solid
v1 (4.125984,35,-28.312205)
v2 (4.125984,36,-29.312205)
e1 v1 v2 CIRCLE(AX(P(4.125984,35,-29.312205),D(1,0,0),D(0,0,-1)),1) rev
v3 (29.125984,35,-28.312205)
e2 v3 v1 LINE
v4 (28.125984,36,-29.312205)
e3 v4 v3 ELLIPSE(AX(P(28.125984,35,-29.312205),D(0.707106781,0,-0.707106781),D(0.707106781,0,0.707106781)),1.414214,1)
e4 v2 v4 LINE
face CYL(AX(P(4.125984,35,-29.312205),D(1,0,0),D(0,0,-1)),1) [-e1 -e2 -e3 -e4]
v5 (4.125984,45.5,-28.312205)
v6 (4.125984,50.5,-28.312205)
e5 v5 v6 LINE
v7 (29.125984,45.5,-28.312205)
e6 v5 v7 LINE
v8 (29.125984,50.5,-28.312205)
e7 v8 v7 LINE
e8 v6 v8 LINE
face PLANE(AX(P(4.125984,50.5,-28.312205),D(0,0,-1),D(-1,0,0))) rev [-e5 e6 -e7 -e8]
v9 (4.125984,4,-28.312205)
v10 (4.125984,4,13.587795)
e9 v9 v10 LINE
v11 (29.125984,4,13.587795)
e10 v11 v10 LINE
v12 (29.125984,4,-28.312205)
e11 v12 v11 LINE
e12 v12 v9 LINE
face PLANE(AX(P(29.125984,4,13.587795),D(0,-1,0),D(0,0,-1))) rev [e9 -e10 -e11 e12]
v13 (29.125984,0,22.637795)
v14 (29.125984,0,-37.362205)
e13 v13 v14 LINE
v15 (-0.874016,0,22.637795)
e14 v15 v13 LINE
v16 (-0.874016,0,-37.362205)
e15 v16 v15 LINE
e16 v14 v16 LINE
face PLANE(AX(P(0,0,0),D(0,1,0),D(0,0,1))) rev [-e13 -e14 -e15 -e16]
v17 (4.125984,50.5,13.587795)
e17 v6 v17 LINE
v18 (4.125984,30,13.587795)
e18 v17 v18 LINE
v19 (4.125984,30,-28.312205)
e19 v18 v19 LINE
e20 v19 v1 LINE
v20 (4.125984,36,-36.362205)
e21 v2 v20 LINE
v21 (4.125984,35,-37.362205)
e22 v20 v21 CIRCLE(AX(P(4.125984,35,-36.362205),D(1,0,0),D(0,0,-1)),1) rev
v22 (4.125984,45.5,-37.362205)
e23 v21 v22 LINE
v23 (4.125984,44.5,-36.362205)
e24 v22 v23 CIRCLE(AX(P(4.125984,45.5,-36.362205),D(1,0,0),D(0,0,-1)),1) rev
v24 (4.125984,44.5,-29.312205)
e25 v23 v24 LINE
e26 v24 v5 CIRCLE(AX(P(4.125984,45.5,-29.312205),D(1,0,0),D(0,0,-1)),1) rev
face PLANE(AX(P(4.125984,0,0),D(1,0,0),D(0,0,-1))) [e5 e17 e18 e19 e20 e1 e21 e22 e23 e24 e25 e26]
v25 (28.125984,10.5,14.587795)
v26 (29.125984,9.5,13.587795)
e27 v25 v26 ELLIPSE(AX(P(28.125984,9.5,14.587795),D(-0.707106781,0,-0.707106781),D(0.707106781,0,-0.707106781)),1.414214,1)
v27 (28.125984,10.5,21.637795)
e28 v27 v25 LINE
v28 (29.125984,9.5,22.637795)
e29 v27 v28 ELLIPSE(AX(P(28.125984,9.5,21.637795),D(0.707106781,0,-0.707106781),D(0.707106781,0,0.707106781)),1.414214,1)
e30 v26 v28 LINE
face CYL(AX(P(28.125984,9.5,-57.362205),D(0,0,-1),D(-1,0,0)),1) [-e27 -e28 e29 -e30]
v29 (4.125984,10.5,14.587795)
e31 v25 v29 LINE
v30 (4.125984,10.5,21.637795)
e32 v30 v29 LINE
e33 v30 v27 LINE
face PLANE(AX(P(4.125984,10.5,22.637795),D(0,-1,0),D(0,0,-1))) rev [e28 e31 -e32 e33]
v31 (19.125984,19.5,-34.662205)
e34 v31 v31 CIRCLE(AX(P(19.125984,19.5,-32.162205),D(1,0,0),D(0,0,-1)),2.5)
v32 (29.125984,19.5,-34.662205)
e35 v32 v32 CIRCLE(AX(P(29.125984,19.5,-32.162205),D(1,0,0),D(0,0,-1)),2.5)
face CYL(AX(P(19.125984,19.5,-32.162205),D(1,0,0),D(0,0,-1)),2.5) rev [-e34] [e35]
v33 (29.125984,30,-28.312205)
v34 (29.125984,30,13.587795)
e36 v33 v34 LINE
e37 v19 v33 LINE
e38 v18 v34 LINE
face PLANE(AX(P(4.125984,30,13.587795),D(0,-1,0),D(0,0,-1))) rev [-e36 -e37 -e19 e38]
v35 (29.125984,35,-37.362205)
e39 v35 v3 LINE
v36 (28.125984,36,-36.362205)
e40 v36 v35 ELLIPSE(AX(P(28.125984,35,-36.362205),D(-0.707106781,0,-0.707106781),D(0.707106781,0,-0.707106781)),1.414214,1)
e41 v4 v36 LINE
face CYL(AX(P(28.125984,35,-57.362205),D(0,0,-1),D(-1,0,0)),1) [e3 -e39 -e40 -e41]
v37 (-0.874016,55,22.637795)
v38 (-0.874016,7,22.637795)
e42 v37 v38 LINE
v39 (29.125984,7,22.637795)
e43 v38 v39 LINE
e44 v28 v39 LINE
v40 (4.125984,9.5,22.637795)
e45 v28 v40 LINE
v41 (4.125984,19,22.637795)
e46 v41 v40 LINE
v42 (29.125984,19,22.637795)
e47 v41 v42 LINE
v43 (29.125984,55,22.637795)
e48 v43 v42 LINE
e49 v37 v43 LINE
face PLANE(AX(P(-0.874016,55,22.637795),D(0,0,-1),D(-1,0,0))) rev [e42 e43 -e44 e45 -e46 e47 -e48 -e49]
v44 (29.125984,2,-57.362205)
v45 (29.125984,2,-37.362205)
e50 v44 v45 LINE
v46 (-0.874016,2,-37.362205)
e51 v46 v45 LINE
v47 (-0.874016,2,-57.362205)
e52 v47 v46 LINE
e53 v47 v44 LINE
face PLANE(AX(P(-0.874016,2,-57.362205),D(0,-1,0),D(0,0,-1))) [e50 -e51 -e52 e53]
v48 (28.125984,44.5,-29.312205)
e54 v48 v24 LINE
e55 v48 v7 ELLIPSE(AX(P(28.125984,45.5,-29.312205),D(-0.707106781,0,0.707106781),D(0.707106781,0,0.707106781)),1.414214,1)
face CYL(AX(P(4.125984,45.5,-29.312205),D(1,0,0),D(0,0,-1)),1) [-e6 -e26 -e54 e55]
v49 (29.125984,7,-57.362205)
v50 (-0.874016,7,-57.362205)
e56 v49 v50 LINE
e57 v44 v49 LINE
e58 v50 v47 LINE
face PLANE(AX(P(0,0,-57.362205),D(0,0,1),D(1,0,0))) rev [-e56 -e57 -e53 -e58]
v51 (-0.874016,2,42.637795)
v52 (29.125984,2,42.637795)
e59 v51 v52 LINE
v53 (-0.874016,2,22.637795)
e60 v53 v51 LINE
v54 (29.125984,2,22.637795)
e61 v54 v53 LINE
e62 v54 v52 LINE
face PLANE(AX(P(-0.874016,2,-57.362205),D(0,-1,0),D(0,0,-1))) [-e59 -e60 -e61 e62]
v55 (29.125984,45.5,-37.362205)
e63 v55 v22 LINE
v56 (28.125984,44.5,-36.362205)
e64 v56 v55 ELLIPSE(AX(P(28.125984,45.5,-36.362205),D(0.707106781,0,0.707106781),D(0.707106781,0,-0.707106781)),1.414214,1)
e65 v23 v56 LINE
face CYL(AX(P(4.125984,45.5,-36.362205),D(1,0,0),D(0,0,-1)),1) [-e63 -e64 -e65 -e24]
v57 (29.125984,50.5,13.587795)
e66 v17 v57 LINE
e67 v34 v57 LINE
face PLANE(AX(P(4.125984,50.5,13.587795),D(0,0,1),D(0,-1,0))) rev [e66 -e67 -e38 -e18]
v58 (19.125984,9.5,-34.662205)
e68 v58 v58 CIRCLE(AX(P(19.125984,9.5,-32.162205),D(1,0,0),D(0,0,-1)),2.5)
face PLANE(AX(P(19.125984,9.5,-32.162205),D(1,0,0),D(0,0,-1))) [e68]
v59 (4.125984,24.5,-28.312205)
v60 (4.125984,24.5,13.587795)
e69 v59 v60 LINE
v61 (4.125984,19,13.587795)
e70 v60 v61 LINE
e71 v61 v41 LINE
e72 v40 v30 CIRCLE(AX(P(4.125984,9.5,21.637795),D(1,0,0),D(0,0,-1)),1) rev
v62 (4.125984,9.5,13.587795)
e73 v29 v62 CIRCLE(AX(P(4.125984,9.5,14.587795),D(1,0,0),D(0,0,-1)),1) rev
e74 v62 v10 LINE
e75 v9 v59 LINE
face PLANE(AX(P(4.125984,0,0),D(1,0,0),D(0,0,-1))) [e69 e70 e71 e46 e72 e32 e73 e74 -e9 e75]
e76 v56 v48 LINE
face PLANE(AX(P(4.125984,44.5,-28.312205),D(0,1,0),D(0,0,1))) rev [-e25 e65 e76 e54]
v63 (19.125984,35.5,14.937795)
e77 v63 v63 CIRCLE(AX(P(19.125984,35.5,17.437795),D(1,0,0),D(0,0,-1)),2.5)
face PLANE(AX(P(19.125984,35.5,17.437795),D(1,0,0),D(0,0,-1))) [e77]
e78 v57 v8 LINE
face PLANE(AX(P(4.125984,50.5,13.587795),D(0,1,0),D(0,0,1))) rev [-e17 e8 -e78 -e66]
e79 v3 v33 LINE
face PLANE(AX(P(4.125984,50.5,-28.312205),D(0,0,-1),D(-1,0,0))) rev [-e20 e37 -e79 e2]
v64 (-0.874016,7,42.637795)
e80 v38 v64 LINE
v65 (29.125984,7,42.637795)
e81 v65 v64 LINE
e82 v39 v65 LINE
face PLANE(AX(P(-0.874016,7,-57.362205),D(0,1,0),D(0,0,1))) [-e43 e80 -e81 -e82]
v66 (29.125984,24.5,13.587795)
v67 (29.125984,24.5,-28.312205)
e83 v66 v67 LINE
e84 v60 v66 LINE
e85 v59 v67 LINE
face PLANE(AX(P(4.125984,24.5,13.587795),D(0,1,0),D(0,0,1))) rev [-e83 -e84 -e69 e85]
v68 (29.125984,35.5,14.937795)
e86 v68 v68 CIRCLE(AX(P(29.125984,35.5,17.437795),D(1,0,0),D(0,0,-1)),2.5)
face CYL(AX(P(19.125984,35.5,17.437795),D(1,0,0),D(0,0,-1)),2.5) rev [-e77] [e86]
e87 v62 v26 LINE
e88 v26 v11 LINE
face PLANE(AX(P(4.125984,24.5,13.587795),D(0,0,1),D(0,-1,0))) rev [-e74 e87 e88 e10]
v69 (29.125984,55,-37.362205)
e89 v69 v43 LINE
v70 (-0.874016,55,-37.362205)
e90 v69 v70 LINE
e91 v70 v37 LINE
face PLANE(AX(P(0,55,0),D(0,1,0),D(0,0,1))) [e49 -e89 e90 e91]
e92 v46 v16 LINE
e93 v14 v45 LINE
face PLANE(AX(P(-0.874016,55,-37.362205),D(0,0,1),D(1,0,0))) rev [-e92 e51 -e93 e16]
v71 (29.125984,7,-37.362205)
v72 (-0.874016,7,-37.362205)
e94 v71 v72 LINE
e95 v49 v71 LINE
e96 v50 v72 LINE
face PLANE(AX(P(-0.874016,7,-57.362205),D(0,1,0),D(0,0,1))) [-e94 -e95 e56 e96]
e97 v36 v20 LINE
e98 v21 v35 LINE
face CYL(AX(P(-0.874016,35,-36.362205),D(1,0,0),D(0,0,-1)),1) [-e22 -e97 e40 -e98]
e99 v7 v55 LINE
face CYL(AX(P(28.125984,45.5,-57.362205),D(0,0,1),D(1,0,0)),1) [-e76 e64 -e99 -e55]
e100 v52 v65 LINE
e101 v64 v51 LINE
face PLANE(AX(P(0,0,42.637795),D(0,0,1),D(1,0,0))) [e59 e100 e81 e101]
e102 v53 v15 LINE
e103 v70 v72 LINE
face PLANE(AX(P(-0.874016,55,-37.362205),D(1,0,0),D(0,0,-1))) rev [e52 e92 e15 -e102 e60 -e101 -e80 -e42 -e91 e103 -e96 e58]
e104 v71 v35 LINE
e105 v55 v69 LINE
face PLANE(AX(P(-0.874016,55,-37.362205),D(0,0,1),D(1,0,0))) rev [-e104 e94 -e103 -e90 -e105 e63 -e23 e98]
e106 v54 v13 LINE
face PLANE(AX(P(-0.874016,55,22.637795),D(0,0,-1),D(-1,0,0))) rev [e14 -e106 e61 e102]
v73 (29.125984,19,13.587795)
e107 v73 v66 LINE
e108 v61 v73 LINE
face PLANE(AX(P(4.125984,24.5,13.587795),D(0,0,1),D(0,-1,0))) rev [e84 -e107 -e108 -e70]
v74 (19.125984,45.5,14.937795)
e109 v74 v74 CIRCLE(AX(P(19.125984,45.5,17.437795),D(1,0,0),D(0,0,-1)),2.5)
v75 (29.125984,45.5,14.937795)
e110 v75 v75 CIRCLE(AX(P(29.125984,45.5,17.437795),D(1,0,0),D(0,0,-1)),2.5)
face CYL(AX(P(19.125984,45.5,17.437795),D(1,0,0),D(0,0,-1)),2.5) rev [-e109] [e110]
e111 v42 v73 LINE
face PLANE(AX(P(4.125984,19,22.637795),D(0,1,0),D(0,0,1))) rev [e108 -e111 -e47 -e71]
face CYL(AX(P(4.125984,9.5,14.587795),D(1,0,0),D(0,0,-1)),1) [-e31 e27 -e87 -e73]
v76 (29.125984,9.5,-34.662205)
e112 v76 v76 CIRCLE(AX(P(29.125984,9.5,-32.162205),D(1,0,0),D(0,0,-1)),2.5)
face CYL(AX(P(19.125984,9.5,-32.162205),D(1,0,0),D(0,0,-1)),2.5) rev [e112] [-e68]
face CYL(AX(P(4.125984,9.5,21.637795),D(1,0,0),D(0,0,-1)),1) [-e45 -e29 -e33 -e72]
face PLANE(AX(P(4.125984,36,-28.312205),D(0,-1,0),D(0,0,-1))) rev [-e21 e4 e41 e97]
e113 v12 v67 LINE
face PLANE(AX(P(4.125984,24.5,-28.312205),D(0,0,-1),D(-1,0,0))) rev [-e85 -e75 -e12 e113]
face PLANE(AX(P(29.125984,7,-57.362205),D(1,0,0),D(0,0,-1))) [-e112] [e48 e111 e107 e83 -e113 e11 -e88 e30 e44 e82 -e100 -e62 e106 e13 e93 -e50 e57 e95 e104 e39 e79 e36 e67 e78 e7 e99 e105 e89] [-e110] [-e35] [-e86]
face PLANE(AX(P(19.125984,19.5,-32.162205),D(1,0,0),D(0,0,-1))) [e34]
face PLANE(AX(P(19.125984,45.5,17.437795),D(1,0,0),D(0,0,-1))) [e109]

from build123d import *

# Parameters (mm, degrees)
SKETCH1_W                 = 43
SKETCH1_H                 = 60
BOSS_EXTRUDE1_DEPTH       = 55
SKETCH2_W                 = 41.9
SKETCH2_H                 = 20.5
SKETCH2_H_2               = 20
CUT_EXTRUDE1_DEPTH        = 38
SKETCH3_W                 = 9.05
SKETCH3_H                 = 8.5
CUT_EXTRUDE2_DEPTH        = 38
BOSS_EXTRUDE5_START       = -0.874015748
BOSS_EXTRUDE5_OUTLINE_W   = 2.5
BOSS_EXTRUDE5_OUTLINE_H   = 41.9
BOSS_EXTRUDE5_OUTLINE_W_2 = 5
BOSS_EXTRUDE5_OUTLINE_H_2 = 20
BOSS_EXTRUDE5_DEPTH       = 30
SKETCH18_R                = 2.5
CUT_EXTRUDE9_DEPTH        = 10
SKETCH19_R                = 2.5
CUT_EXTRUDE10_DEPTH       = 10
SKETCH20_W                = 41.9
SKETCH20_H                = 5
CUT_EXTRUDE11_DEPTH       = 25
SKETCH21_W                = 60
SKETCH21_H                = 55
CUT_EXTRUDE12_DEPTH       = 13
SKETCH22_W                = 41.9
SKETCH22_H                = 2
BOSS_EXTRUDE6_DEPTH       = 25
FILLET4_R                 = 1
FILLET5_R                 = 1


# Read off the part's stored shape, not the designer's step: Boss-Extrude5
with BuildPart() as part:
    # Sketch1 → Boss-Extrude1 (new body)
    with BuildSketch(Plane(origin=(0, 0, 0), x_dir=(1, 0, 0), z_dir=(0, 1, 0))):
        with Locations((20.625984252, 7.362204724)):
            Rectangle(SKETCH1_W, SKETCH1_H)
    extrude(amount=BOSS_EXTRUDE1_DEPTH)

    # Sketch2 → Cut-Extrude1 (cut)
    with BuildSketch(Plane(origin=(42.125984252, 0, 0), x_dir=(0, 0, -1), z_dir=(1, 0, 0))):
        with Locations((7.362204724, 40.25)):
            Rectangle(SKETCH2_W, SKETCH2_H)
        with Locations((7.362204724, 14.5)):
            Rectangle(SKETCH2_W, SKETCH2_H_2)
    extrude(amount=-CUT_EXTRUDE1_DEPTH, mode=Mode.SUBTRACT)

    # Sketch3 → Cut-Extrude2 (cut)
    with BuildSketch(Plane(origin=(42.125984252, 0, 0), x_dir=(0, 0, -1), z_dir=(1, 0, 0))):
        with Locations((-18.112795276, 14.75)):
            Rectangle(SKETCH3_W, SKETCH3_H)
        with Locations((32.837204724, 40.25)):
            Rectangle(SKETCH3_W, SKETCH3_H)
    extrude(amount=-CUT_EXTRUDE2_DEPTH, mode=Mode.SUBTRACT)

    # Boss-Extrude5 outline → Boss-Extrude5 (add)
    with BuildSketch(Plane.YZ.offset(BOSS_EXTRUDE5_START)):
        with Locations((5.75, -7.362204724)):
            Rectangle(BOSS_EXTRUDE5_OUTLINE_W, BOSS_EXTRUDE5_OUTLINE_H)
        with Locations((4.5, -47.362204724)):
            Rectangle(BOSS_EXTRUDE5_OUTLINE_W_2, BOSS_EXTRUDE5_OUTLINE_H_2)
        with Locations((4.5, 32.637795276)):
            Rectangle(BOSS_EXTRUDE5_OUTLINE_W_2, BOSS_EXTRUDE5_OUTLINE_H_2)
    extrude(amount=BOSS_EXTRUDE5_DEPTH)

    # Sketch18 → Cut-Extrude9 (cut)
    with BuildSketch(Plane(origin=(29.125984252, 0, 0), x_dir=(0, 0, -1), z_dir=(1, 0, 0))):
        with Locations((-17.437795276, 45.5)):
            Circle(SKETCH18_R)
        with Locations((-17.437795276, 35.5)):
            Circle(SKETCH18_R)
    extrude(amount=-CUT_EXTRUDE9_DEPTH, mode=Mode.SUBTRACT)

    # Sketch19 → Cut-Extrude10 (cut)
    with BuildSketch(Plane(origin=(29.125984252, 0, 0), x_dir=(0, 0, -1), z_dir=(1, 0, 0))):
        with Locations((32.162204724, 19.5)):
            Circle(SKETCH19_R)
        with Locations((32.162204724, 9.5)):
            Circle(SKETCH19_R)
    extrude(amount=-CUT_EXTRUDE10_DEPTH, mode=Mode.SUBTRACT)

    # Sketch20 → Cut-Extrude11 (cut)
    with BuildSketch(Plane(origin=(29.125984252, 0, 0), x_dir=(0, 0, -1), z_dir=(1, 0, 0))):
        with Locations((7.362204724, 4.5)):
            Rectangle(SKETCH20_W, SKETCH20_H)
    extrude(amount=-CUT_EXTRUDE11_DEPTH, mode=Mode.SUBTRACT)

    # Sketch21 → Cut-Extrude12 (cut)
    with BuildSketch(Plane(origin=(42.125984252, 0, 0), x_dir=(0, 0, -1), z_dir=(1, 0, 0))):
        with Locations((7.362204724, 27.5)):
            Rectangle(SKETCH21_W, SKETCH21_H)
    extrude(amount=-CUT_EXTRUDE12_DEPTH, mode=Mode.SUBTRACT)

    # Sketch22 → Boss-Extrude6 (add)
    with BuildSketch(Plane(origin=(4.125984252, 0, 0), x_dir=(0, 0, -1), z_dir=(1, 0, 0))):
        with Locations((7.362204724, 3)):
            Rectangle(SKETCH22_W, SKETCH22_H)
    extrude(amount=BOSS_EXTRUDE6_DEPTH)

    # Fillet4
    fillet4_edges = [part.edges().sort_by_distance(p)[0] for p in [
        (29.125984252, 44.5, -32.837204724),
        (29.125984252, 36, -32.837204724),
        (16.625984252, 36, -28.312204724),
        (16.625984252, 44.5, -28.312204724),
        (16.625984252, 44.5, -37.362204724),
        (16.625984252, 36, -37.362204724),
    ]]
    fillet(fillet4_edges, radius=FILLET4_R)

    # Fillet5
    fillet5_edges = [part.edges().sort_by_distance(p)[0] for p in [
        (29.125984252, 10.5, 18.112795276),
        (16.625984252, 10.5, 22.637795276),
        (16.625984252, 10.5, 13.587795276),
    ]]
    fillet(fillet5_edges, radius=FILLET5_R)


solid = part.part
